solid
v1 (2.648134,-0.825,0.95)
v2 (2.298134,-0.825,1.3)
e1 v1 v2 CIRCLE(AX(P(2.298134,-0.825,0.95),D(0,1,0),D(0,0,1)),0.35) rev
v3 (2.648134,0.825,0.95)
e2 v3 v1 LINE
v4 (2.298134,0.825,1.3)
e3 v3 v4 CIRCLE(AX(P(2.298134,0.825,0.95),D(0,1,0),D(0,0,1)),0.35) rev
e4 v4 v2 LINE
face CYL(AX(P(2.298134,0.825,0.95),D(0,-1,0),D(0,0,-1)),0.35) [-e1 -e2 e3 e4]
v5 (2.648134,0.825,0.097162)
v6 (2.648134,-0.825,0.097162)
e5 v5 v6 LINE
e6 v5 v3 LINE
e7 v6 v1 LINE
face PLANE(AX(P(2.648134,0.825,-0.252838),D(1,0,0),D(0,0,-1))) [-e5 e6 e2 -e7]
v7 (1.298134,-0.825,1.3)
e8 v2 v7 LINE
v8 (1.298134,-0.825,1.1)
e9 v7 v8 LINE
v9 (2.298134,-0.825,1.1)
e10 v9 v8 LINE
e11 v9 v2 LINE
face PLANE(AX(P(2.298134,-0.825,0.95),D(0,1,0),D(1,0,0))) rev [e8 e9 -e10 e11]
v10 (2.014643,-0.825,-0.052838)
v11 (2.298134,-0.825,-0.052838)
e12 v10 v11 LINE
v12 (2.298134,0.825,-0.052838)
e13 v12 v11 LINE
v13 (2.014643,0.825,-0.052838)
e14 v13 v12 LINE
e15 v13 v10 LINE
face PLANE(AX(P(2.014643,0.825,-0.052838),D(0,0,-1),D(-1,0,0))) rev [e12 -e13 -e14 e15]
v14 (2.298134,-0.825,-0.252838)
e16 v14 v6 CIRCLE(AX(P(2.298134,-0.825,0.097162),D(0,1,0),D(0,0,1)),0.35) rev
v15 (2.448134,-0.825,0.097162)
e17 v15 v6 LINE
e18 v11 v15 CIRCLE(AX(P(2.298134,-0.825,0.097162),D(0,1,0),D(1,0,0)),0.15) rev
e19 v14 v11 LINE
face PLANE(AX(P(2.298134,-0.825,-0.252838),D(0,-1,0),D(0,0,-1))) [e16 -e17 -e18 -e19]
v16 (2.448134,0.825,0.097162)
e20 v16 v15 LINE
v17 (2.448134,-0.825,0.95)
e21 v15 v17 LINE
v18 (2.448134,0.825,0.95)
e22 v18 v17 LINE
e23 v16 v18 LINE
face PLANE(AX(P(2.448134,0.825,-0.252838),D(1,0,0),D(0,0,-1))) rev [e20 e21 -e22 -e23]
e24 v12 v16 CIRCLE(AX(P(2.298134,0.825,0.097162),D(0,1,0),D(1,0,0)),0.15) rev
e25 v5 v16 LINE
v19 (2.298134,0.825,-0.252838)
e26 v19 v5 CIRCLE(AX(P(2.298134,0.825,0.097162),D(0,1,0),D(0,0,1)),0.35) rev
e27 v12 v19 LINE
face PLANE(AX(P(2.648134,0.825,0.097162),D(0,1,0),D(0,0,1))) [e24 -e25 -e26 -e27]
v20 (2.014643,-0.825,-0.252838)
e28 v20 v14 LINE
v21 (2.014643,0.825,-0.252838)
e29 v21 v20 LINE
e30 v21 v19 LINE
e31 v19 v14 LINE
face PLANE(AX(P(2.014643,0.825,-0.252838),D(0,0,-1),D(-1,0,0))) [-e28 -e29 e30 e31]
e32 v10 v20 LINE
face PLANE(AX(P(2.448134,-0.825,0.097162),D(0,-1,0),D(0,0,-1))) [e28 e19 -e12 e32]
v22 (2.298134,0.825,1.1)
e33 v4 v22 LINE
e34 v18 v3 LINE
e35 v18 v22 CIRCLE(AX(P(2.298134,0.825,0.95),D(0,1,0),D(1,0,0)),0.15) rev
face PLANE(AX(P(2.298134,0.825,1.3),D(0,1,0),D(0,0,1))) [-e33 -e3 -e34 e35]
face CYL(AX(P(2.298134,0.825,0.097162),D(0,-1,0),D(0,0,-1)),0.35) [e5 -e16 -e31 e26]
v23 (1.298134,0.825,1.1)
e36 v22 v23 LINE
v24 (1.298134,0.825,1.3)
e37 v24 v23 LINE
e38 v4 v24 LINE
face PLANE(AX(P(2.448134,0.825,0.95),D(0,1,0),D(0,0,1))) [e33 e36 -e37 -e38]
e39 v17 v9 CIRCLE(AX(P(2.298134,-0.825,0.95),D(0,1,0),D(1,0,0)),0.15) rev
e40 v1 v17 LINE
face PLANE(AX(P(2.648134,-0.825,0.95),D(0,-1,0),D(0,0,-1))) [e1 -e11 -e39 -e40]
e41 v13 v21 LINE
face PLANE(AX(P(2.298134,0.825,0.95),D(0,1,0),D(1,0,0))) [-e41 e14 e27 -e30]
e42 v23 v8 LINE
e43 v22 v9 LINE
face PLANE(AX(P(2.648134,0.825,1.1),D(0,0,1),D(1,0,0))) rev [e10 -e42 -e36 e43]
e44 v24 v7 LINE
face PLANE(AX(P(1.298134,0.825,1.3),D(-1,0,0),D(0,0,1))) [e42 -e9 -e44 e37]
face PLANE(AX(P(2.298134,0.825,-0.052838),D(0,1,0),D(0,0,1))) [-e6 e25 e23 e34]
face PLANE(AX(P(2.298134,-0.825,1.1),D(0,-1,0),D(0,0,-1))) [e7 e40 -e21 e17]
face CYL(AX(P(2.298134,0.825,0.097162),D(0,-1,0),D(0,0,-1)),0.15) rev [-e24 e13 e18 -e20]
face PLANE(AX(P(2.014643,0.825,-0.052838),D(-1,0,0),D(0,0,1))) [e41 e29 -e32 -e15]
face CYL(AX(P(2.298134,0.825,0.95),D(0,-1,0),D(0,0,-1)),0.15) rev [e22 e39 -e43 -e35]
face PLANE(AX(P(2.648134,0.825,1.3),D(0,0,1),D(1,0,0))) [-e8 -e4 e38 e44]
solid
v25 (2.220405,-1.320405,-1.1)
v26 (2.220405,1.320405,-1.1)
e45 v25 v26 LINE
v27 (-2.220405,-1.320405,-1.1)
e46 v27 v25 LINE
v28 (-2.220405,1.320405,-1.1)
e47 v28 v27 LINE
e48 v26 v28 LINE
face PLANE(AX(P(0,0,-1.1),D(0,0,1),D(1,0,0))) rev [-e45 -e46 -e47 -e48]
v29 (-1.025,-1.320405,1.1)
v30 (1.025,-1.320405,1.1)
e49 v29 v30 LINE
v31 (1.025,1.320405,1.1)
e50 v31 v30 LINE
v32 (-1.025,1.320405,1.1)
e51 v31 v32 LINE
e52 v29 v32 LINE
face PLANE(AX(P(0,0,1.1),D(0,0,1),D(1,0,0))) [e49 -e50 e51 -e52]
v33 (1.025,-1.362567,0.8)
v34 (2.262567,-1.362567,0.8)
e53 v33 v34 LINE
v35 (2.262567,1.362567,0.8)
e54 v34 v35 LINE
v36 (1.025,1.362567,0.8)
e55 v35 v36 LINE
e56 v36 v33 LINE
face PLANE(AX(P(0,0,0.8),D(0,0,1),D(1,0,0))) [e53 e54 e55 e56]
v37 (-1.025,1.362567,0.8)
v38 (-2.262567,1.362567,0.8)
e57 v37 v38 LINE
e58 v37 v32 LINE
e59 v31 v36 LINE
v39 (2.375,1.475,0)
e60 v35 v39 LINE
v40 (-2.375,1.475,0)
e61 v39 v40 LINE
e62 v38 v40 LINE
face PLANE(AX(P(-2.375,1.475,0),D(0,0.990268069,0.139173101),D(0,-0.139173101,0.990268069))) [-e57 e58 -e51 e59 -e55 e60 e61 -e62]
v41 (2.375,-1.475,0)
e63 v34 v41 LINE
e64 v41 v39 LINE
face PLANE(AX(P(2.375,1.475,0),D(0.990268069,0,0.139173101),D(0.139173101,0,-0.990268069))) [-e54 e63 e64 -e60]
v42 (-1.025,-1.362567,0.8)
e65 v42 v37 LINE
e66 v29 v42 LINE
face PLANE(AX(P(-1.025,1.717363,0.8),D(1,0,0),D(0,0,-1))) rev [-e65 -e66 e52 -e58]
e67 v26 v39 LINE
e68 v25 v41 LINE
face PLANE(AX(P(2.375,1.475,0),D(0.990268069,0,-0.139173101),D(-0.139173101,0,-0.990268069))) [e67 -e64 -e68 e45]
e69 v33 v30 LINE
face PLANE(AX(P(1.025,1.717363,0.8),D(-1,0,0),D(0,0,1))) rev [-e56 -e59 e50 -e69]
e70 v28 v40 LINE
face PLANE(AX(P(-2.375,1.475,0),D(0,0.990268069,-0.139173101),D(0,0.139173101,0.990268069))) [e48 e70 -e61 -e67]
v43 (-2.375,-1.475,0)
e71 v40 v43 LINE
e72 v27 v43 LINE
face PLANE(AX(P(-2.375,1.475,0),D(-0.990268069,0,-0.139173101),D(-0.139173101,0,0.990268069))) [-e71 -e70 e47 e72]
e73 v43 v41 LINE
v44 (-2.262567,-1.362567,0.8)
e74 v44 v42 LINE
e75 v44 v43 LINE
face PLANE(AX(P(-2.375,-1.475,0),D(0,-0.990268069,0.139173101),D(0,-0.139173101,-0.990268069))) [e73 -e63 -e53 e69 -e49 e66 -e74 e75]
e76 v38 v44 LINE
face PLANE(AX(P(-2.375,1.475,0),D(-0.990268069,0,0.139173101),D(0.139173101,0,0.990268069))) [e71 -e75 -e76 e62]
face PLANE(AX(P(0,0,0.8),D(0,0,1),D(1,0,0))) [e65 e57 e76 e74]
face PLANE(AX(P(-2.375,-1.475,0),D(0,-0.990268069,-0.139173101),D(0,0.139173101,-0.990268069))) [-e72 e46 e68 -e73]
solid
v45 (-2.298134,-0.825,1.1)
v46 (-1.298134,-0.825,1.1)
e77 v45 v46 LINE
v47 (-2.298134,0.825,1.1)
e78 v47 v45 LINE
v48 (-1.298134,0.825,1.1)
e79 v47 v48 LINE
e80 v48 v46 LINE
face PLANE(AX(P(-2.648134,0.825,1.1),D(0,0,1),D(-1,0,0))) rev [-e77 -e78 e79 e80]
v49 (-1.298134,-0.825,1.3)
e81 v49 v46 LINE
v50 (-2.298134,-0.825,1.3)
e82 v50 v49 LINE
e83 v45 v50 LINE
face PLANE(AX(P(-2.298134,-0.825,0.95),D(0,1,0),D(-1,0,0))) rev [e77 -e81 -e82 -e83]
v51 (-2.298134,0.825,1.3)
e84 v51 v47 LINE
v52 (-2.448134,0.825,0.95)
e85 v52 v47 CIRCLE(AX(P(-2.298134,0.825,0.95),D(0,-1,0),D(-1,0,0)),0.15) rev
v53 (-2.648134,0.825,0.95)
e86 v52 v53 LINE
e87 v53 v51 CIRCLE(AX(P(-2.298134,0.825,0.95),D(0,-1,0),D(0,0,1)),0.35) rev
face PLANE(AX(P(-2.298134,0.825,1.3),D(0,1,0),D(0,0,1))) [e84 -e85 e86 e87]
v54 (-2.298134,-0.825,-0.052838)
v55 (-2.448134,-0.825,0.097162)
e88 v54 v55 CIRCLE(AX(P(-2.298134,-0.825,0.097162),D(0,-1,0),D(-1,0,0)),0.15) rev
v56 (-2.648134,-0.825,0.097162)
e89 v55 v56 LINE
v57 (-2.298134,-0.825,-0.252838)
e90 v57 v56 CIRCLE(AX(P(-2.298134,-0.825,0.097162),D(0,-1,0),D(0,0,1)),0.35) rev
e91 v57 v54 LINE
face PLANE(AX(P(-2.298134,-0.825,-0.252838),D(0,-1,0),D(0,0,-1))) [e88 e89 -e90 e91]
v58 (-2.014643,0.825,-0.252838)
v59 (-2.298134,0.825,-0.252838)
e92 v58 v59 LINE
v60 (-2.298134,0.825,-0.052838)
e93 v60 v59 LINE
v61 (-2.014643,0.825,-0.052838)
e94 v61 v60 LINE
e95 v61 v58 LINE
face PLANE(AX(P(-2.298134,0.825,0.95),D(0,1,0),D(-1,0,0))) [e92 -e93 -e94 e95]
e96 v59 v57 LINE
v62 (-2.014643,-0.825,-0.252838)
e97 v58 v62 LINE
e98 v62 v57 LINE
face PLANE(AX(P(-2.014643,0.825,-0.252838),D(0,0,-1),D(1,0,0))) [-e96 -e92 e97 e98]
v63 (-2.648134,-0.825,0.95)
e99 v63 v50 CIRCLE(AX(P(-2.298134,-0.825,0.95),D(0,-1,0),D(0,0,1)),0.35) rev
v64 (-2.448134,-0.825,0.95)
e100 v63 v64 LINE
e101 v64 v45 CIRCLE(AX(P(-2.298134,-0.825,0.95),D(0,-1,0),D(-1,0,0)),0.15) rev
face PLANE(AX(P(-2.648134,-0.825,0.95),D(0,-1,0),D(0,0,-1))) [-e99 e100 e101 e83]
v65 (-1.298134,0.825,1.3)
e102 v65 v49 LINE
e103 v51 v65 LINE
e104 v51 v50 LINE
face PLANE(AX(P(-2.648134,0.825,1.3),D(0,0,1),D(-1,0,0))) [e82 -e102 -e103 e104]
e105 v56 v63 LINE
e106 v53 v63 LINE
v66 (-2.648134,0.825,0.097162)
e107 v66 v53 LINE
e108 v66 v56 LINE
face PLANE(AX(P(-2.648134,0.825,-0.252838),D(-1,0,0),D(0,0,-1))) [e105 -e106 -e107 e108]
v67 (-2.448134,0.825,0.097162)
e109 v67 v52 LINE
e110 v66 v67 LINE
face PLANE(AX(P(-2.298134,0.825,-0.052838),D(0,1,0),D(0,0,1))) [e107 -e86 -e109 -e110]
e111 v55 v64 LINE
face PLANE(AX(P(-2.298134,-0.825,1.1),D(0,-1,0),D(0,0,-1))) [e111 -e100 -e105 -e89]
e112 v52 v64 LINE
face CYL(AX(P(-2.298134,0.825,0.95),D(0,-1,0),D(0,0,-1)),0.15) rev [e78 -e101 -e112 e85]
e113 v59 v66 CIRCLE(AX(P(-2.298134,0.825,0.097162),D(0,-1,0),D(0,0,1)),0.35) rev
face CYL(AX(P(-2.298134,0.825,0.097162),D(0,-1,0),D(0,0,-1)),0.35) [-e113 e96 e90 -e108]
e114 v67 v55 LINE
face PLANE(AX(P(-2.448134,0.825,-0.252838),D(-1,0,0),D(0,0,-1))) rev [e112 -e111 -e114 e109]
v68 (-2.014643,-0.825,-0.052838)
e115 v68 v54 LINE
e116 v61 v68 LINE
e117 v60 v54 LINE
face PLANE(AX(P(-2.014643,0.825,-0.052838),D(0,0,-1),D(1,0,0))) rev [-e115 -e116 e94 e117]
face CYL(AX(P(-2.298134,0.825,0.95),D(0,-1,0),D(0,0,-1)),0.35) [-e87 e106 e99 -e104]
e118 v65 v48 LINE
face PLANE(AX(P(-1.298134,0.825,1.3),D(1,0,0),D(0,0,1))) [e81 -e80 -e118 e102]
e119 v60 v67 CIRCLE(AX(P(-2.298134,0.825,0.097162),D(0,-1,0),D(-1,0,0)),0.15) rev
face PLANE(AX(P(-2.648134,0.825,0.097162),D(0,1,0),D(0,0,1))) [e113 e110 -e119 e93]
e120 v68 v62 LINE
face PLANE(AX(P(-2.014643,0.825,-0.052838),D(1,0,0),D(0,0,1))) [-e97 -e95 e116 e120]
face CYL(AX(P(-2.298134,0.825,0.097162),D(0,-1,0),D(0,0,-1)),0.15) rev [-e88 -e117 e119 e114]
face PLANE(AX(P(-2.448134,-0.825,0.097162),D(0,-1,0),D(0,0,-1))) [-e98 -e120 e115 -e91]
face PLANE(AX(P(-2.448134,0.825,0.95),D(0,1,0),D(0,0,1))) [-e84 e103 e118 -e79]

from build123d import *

# Parameters (mm, degrees)
SKETCH1_W                     = 4.75
SKETCH1_H                     = 2.95
BOSS_EXTRUDE1_DEPTH           = 1.1
BOSS_EXTRUDE1_TAPER           = 8
BOSS_EXTRUDE1_OTHER_WAY_DEPTH = 1.1
BOSS_EXTRUDE1_OTHER_WAY_TAPER = 8
SKETCH3_W                     = 1.787084683
SKETCH3_H                     = 3.398135214
SKETCH3_W_2                   = 1.719767091
CUT_EXTRUDE2_DEPTH            = 0.3
BASE_FLANGE1_DEPTH            = 0.825
BASE_FLANGE1_DEPTH_BACK       = 0.825


# Sheet-metal steps are written as plain solids
with BuildPart() as part:
    # Sketch1 → Boss-Extrude1 (new body)
    with BuildSketch(Plane.XY):
        Rectangle(SKETCH1_W, SKETCH1_H)
    extrude(amount=BOSS_EXTRUDE1_DEPTH, taper=BOSS_EXTRUDE1_TAPER)

    # Sketch1 → Boss-Extrude1 other way (add)
    with BuildSketch(Plane.XY):
        Rectangle(SKETCH1_W, SKETCH1_H)
    extrude(amount=-BOSS_EXTRUDE1_OTHER_WAY_DEPTH, taper=BOSS_EXTRUDE1_OTHER_WAY_TAPER)

    # Sketch3 → Cut-Extrude2 (cut)
    with BuildSketch(Plane.XY.offset(1.1)):
        with Locations((1.918542342, 0.018295727)):
            Rectangle(SKETCH3_W, SKETCH3_H)
        with Locations((-1.884883546, 0.018295727)):
            Rectangle(SKETCH3_W_2, SKETCH3_H)
    extrude(amount=-CUT_EXTRUDE2_DEPTH, mode=Mode.SUBTRACT)


with BuildPart() as body_2:
    # Sketch4 → Base-Flange1 (new, two sides: drawn at the far end of the back side and taken through both)
    with BuildSketch(Plane(origin=(0, 0, 0), x_dir=(1, 0, 0), z_dir=(0, 1, 0)).offset(-BASE_FLANGE1_DEPTH_BACK)):
        with BuildLine():
            Line((2.014642842, 0.252838218), (2.298133825, 0.252838218))
            ThreePointArc((2.298133825, 0.252838218), (2.545621198, 0.150325591), (2.648133825, -0.097161782))
            Line((2.648133825, -0.097161782), (2.648133825, -0.95))
            ThreePointArc((2.648133825, -0.95), (2.545621198, -1.197487373), (2.298133825, -1.3))
            Line((2.298133825, -1.3), (1.298133825, -1.3))
            Line((1.298133825, -1.3), (1.298133825, -1.1))
            Line((1.298133825, -1.1), (2.298133825, -1.1))
            ThreePointArc((2.298133825, -1.1), (2.404199842, -1.056066017), (2.448133825, -0.95))
            Line((2.448133825, -0.95), (2.448133825, -0.097161782))
            ThreePointArc((2.448133825, -0.097161782), (2.404199842, 0.008904235), (2.298133825, 0.052838218))
            Line((2.298133825, 0.052838218), (2.014642842, 0.052838218))
            Line((2.014642842, 0.052838218), (2.014642842, 0.252838218))
        make_face()
    extrude(amount=BASE_FLANGE1_DEPTH + BASE_FLANGE1_DEPTH_BACK)


with BuildPart() as body_3:
    # Mirror1: mirrored copy
    add(body_2.part.mirror(Plane.ZY))


solid = Compound([part.part, body_2.part, body_3.part])
